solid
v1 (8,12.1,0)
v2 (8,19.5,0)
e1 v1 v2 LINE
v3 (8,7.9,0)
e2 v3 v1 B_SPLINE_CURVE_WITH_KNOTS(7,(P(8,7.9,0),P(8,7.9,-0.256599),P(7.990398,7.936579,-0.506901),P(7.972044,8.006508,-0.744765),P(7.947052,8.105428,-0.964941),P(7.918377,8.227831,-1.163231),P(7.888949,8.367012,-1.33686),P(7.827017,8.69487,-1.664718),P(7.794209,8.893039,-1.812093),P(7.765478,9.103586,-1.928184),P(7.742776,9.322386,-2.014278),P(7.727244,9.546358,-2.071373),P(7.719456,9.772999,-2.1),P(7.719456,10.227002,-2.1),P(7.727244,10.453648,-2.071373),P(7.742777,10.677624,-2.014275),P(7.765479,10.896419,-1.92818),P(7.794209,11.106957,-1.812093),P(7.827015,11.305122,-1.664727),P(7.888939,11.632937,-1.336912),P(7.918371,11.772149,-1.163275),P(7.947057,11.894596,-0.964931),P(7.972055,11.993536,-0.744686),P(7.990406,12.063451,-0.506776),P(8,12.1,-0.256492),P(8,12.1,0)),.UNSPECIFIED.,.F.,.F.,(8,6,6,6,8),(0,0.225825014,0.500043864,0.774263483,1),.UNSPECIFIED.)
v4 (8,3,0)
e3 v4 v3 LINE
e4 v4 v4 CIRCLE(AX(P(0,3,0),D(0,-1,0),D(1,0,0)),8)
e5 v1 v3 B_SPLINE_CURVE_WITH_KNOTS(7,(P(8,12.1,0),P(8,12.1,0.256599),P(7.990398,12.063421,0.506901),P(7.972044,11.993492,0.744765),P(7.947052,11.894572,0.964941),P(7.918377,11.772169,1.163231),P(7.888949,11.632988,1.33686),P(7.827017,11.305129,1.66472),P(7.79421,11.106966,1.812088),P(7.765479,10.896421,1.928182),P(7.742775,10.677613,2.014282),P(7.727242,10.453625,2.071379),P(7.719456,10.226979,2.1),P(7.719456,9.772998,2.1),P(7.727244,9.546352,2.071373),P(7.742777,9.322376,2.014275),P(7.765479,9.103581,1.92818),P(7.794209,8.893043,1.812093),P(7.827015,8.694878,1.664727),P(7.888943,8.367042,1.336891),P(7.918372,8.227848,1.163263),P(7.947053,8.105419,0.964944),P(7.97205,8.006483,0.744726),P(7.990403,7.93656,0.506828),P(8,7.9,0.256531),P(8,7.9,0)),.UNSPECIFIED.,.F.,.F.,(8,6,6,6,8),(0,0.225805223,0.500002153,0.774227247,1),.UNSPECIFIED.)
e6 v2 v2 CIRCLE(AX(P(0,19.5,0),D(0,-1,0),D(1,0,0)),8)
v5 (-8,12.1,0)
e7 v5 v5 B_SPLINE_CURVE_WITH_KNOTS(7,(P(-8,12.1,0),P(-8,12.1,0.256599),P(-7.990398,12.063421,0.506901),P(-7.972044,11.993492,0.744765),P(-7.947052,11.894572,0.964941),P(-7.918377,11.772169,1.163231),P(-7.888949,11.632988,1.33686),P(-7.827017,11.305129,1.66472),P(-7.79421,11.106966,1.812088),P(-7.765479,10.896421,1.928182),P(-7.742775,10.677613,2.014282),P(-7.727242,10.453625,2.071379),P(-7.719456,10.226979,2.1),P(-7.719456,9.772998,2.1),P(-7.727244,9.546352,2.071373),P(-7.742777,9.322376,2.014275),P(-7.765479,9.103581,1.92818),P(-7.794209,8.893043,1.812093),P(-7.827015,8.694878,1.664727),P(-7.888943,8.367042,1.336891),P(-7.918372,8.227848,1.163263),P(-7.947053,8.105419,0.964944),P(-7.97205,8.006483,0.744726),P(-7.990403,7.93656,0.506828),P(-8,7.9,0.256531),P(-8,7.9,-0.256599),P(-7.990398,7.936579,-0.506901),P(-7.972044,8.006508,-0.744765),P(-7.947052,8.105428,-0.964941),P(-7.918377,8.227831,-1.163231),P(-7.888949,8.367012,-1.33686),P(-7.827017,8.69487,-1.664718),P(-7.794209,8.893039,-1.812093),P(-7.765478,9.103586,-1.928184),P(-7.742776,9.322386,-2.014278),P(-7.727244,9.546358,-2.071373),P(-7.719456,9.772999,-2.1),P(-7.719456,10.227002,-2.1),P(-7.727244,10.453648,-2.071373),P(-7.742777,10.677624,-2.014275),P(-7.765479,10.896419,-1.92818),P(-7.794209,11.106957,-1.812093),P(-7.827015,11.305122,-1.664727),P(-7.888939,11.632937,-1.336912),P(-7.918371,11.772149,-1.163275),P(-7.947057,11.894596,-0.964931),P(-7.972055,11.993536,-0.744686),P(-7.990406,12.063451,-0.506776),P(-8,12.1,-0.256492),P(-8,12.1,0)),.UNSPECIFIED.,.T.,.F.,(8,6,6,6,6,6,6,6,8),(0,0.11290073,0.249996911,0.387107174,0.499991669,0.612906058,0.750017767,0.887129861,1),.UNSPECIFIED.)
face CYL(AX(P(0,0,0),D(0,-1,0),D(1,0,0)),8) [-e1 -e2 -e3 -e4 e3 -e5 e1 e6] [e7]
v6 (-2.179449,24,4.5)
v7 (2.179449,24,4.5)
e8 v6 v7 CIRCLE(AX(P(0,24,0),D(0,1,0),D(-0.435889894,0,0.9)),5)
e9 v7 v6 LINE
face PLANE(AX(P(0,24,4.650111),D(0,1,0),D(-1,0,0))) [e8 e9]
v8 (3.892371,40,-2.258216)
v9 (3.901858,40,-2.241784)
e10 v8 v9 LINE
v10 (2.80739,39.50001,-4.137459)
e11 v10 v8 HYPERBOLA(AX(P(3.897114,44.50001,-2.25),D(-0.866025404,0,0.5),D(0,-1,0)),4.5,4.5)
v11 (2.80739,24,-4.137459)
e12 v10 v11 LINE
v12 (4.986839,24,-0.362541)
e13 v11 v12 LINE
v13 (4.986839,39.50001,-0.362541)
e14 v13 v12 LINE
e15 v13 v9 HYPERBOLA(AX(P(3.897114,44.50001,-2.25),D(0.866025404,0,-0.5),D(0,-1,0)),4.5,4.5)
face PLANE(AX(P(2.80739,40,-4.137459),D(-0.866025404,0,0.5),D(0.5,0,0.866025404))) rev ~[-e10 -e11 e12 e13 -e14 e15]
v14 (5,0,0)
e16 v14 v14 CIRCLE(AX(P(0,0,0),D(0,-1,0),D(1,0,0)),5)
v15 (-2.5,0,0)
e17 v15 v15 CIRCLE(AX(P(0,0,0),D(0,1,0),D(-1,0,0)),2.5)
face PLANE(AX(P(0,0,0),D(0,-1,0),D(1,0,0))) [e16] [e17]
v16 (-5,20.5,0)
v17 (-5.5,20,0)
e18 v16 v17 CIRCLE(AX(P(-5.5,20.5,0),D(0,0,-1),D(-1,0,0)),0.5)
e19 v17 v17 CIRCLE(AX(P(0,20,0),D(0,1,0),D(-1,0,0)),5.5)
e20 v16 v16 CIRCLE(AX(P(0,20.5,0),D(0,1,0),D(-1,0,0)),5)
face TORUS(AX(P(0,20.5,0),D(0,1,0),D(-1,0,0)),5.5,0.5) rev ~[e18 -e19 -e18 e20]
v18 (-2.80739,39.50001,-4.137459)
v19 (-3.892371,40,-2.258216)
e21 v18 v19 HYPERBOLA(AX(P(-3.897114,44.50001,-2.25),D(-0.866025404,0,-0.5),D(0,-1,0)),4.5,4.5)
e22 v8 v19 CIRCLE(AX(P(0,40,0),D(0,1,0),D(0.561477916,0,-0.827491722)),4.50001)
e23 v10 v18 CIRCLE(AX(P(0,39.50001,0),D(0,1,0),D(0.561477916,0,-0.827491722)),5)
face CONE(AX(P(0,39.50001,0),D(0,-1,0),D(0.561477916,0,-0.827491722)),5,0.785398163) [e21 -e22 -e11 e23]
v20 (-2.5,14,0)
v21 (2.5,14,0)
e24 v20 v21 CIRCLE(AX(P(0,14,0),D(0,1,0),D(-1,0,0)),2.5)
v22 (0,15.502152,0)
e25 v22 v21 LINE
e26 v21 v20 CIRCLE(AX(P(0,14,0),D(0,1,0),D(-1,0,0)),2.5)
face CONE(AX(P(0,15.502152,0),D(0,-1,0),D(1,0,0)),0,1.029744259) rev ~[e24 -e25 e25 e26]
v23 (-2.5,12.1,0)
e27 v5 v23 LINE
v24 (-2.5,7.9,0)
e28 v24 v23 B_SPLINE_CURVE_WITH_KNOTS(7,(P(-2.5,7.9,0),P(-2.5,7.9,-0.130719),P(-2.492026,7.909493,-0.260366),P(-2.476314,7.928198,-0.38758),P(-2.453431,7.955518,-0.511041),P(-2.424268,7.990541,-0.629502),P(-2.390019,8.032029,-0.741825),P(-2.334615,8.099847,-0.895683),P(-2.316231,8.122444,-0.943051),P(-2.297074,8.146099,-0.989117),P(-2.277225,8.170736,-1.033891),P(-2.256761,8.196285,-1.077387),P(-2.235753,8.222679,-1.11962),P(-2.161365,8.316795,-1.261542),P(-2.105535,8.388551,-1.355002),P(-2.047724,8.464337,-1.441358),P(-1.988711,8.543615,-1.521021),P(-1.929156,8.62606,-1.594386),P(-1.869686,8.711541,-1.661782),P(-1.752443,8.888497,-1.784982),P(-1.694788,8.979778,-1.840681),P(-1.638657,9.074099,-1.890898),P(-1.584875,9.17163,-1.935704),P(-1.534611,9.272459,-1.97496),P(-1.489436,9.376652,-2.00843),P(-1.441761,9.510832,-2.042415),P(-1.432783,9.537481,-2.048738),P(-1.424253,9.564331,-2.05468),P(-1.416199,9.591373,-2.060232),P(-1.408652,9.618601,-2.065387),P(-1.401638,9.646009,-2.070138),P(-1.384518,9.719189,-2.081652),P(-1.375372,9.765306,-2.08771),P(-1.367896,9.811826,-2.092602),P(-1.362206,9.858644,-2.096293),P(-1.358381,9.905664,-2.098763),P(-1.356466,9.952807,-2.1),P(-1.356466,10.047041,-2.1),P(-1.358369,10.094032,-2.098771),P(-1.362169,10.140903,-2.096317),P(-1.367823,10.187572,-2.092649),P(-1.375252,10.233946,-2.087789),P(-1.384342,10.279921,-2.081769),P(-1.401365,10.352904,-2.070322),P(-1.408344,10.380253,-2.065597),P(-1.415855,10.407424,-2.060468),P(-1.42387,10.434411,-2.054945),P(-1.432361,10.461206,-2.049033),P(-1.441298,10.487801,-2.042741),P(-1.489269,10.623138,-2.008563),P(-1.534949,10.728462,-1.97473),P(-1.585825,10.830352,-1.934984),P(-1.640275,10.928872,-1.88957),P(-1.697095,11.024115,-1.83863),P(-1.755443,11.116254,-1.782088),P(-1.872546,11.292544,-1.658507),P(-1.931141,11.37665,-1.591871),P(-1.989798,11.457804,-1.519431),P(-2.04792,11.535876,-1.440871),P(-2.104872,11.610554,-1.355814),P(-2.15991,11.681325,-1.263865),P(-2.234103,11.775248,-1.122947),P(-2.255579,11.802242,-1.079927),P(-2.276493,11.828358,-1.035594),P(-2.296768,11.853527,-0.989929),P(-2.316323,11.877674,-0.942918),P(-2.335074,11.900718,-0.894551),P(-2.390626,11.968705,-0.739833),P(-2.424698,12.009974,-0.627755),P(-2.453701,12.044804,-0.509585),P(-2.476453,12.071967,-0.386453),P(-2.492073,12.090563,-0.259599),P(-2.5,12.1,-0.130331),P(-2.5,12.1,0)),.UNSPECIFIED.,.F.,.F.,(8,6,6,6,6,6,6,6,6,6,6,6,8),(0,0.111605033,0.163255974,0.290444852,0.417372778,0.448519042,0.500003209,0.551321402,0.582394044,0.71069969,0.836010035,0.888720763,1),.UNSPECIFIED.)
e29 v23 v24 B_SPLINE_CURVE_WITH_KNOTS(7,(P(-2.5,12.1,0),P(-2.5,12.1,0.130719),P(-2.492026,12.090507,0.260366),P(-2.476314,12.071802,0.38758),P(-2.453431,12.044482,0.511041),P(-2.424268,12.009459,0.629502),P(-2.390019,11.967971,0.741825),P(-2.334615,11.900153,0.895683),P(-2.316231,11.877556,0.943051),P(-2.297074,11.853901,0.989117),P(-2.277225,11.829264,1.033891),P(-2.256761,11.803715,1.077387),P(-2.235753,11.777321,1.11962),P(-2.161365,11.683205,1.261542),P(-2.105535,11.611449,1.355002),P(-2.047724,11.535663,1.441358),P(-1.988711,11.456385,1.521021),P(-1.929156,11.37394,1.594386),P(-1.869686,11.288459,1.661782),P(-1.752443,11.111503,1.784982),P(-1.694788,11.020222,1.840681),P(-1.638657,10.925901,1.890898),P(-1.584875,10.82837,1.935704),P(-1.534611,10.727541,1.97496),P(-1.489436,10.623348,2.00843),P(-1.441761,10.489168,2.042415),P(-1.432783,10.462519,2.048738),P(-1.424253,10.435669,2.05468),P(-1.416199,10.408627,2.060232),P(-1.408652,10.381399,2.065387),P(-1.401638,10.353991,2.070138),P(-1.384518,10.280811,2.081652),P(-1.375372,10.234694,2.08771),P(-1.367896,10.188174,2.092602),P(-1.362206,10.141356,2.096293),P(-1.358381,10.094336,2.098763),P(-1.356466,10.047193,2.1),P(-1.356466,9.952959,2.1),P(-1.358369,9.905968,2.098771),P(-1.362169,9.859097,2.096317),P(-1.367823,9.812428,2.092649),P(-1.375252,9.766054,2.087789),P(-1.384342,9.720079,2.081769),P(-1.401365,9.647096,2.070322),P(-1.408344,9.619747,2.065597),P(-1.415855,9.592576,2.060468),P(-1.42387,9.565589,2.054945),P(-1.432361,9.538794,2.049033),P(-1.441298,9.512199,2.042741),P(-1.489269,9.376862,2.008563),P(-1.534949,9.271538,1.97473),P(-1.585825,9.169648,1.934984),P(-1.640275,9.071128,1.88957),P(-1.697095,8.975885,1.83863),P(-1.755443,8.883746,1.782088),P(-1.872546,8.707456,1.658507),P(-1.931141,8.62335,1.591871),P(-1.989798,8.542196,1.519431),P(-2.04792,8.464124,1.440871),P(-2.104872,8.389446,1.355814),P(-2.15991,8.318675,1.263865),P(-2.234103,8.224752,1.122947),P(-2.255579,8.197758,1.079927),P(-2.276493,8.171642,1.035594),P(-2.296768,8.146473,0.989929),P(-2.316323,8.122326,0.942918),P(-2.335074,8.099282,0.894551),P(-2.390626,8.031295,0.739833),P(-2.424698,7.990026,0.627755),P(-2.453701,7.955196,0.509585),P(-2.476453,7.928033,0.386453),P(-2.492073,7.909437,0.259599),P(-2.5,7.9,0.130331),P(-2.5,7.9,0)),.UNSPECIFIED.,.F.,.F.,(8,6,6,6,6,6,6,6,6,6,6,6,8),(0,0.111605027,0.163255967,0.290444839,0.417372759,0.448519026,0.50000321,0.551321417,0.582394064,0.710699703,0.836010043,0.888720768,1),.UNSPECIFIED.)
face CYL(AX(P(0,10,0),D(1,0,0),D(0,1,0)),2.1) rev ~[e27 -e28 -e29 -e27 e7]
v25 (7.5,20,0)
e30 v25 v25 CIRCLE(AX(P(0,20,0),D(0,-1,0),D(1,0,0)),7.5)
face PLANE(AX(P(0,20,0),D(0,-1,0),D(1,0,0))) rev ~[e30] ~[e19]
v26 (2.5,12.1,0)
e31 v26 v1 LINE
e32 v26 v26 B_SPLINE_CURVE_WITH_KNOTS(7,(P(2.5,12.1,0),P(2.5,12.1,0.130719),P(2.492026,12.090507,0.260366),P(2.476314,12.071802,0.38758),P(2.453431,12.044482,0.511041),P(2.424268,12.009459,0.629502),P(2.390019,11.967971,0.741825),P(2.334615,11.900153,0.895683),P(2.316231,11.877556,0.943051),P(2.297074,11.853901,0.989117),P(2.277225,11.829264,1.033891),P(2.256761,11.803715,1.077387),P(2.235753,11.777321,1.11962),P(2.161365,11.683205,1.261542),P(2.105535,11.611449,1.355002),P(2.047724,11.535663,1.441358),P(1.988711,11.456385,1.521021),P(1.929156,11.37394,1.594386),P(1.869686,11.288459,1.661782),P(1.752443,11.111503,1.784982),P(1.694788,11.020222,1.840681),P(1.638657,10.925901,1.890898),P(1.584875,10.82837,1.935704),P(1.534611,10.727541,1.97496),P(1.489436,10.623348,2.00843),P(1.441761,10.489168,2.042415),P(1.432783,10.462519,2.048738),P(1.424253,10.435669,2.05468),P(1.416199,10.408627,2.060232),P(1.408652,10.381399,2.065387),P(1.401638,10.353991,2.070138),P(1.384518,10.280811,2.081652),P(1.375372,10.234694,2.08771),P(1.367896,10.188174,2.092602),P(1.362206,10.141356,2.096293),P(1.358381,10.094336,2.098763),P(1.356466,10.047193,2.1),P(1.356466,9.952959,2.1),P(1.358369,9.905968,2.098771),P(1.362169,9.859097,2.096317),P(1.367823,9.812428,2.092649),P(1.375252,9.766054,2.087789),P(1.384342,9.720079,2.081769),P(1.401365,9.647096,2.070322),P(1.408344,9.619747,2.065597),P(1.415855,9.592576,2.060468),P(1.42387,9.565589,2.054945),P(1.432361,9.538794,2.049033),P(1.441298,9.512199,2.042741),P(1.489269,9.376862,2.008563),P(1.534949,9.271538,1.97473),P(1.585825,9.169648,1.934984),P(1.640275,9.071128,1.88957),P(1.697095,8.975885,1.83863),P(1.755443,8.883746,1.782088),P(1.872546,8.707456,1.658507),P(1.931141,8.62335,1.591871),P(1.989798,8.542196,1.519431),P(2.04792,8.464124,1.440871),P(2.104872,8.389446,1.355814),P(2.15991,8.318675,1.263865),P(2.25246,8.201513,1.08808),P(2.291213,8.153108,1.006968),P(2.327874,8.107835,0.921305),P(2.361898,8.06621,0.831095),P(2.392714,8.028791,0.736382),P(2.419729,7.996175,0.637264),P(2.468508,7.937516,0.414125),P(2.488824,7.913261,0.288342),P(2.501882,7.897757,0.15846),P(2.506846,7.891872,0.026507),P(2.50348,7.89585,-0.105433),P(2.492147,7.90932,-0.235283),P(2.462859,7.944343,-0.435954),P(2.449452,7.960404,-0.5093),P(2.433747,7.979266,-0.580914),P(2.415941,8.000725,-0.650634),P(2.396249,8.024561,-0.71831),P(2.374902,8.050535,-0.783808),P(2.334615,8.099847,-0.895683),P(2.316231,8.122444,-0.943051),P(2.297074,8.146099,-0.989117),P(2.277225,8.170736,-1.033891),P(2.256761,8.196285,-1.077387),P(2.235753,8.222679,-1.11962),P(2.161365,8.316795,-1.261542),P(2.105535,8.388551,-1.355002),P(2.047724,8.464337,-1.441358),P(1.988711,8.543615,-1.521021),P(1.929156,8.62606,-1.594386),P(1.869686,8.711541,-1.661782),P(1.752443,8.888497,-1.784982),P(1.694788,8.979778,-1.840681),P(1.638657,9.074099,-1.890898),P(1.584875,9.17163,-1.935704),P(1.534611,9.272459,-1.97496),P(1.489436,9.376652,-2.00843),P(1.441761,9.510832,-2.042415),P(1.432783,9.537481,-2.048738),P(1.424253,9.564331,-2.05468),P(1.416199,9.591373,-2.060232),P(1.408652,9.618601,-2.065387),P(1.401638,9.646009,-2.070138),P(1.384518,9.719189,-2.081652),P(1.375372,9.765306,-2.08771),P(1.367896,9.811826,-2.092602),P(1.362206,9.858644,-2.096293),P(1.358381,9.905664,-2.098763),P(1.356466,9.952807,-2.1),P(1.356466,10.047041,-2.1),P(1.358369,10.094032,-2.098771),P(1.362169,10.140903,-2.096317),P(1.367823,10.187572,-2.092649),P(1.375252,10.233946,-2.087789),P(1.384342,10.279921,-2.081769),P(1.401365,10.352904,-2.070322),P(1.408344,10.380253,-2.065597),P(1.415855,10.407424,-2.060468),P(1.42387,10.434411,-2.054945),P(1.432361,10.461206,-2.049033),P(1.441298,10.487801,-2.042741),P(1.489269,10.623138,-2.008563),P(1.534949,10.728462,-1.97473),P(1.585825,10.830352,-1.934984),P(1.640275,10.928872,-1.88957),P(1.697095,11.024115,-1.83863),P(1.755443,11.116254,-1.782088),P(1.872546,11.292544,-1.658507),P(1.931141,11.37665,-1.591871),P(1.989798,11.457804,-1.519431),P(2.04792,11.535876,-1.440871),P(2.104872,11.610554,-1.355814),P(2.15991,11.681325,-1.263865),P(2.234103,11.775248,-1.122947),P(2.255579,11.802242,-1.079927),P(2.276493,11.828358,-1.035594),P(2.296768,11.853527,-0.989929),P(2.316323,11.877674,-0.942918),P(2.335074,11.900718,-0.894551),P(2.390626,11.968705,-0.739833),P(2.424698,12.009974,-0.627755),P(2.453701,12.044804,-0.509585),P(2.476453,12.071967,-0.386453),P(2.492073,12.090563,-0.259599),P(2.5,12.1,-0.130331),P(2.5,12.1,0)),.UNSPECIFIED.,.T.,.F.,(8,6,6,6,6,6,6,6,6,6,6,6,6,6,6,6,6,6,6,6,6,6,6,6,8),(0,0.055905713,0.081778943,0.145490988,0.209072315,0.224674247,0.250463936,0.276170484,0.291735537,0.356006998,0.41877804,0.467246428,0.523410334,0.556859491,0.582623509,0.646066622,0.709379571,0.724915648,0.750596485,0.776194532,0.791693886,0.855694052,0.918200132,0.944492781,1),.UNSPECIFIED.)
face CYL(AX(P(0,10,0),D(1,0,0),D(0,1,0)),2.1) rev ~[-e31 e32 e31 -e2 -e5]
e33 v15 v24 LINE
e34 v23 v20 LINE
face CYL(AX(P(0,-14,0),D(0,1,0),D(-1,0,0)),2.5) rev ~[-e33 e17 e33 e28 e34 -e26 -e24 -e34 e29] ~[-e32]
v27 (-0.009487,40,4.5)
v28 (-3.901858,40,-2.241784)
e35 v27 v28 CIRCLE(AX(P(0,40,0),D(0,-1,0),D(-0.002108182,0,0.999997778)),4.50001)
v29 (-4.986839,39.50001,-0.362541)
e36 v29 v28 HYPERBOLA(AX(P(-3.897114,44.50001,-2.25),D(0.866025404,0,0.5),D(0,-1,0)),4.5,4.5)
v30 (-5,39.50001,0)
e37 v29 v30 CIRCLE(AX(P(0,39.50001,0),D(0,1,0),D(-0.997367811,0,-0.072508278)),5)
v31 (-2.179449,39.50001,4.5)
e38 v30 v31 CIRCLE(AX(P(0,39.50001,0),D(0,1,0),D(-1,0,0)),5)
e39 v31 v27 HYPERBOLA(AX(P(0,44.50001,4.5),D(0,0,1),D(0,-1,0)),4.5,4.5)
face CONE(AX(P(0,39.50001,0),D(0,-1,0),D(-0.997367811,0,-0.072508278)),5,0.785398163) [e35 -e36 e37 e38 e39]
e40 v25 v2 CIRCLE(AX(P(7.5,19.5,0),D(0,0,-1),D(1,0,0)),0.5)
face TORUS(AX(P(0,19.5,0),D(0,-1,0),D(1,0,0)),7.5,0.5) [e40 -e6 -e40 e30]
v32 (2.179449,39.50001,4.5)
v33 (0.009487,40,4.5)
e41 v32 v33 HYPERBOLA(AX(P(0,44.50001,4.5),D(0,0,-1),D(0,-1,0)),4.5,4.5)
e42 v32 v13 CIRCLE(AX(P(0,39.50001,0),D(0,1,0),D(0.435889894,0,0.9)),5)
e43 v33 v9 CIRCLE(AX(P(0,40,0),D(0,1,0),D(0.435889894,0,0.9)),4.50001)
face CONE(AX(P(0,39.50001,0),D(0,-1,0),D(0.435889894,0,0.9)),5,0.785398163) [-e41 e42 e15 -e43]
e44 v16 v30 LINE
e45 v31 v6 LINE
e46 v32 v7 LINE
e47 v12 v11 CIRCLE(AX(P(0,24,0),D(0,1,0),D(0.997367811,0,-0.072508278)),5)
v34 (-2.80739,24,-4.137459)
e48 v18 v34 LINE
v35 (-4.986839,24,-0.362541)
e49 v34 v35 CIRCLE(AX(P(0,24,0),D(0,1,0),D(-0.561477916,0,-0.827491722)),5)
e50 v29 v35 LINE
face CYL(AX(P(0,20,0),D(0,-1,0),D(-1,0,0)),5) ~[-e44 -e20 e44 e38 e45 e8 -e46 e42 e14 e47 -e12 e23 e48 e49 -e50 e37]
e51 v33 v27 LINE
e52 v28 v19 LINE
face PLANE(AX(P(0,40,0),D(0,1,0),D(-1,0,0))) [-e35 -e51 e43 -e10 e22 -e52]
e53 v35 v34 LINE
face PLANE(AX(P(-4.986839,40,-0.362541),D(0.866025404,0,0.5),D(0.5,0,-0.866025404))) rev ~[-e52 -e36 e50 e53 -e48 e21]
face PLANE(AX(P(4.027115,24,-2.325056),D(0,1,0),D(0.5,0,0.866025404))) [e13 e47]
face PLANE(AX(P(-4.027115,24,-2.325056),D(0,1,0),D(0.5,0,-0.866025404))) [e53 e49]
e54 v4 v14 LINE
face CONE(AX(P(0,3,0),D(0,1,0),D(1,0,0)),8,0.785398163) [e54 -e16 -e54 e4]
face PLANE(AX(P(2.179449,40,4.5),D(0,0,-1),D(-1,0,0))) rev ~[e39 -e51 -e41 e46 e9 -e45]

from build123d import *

# Parameters (mm, degrees)
F0_R            = 8
F1_DEPTH        = 20
F2_R            = 5
F3_DEPTH        = 20
F5_DEPTH        = 16
F5_COPIES_COUNT = 3
F6_SIZE         = 0.49999
F7_R            = 0.5
F9_D            = 5
F9_DEPTH        = 14
F9_TIP          = 1.5021515476
F10_R           = 2.1
F11_DEPTH       = 8.25
F12_SIZE        = 3


# Not quite as in the source:
# - a fillet or chamfer is up to 0.001 mm smaller than in the source, because OpenCascade refuses the exact size
# - a pattern or mirror of a feature is missing from the dataset's text; its kind, count and spacing are read off the source's solid


with BuildPart() as f1:
    # F0 (on Front) → F1 (new body)
    with BuildSketch(Plane.XZ):
        Circle(F0_R)
    extrude(amount=-F1_DEPTH)

    # F2 (on face) → F3 (join)
    with BuildSketch(Plane(origin=(0, 20, 0), x_dir=(-1, 0, 0), z_dir=(0, 1, 0))):
        Circle(F2_R)
    extrude(amount=F3_DEPTH)

    # F4 (on face) → F5 (cut)
    with BuildSketch(Plane(origin=(0, 40, 0), x_dir=(-1, 0, 0), z_dir=(0, 1, 0))):
        with BuildLine():
            ThreePointArc((2.1794494718, 4.5), (0, 5), (-2.1794494718, 4.5))
            Line((-2.1794494718, 4.5), (2.1794494718, 4.5))
        make_face()
    f5 = extrude(amount=-F5_DEPTH, mode=Mode.SUBTRACT)

    # F5_copies: F5 ×3 about axis
    f5_copies_axis = Axis((0, 0, 0), (0, 1, 0))
    for i in range(1, F5_COPIES_COUNT):
        add(f5.rotate(f5_copies_axis, i * 360 / F5_COPIES_COUNT), mode=Mode.SUBTRACT)

    # F6 (size 0.5 in the source; OpenCascade refuses exactly that, so slightly less here)
    f6_edges = [f1.edges().sort_by_distance(p)[0] for p in [
        (4.330127, 40, 2.5),
        (-4.996709, 40, -0.18139),
        (0, 40, -5),
        (-4.236582, 40, 2.655443),
    ]]
    chamfer(f6_edges, length=F6_SIZE)

    # F7
    f7_edges = [f1.edges().sort_by_distance(p)[0] for p in [
        (-8, 20, 0),
        (5, 20, 0),
    ]]
    fillet(f7_edges, radius=F7_R)

    # F9
    with Locations(Plane.XZ):
        with Locations((0, 0)):
            Hole(F9_D / 2, depth=F9_DEPTH)
            with Locations((0, 0, -(F9_DEPTH + F9_TIP / 2))):  # 118° drill point
                Cone(0, F9_D / 2, F9_TIP, mode=Mode.SUBTRACT)

    # F10 (on Right) → F11 (cut, symmetric)
    with BuildSketch(Plane.YZ):
        with Locations((10, 0)):
            Circle(F10_R)
    extrude(amount=F11_DEPTH, both=True, mode=Mode.SUBTRACT)

    # F12
    f12_edges = [f1.edges().sort_by_distance(p)[0] for p in [
        (-8, 0, 0),
    ]]
    chamfer(f12_edges, length=F12_SIZE)


solid = f1.part
